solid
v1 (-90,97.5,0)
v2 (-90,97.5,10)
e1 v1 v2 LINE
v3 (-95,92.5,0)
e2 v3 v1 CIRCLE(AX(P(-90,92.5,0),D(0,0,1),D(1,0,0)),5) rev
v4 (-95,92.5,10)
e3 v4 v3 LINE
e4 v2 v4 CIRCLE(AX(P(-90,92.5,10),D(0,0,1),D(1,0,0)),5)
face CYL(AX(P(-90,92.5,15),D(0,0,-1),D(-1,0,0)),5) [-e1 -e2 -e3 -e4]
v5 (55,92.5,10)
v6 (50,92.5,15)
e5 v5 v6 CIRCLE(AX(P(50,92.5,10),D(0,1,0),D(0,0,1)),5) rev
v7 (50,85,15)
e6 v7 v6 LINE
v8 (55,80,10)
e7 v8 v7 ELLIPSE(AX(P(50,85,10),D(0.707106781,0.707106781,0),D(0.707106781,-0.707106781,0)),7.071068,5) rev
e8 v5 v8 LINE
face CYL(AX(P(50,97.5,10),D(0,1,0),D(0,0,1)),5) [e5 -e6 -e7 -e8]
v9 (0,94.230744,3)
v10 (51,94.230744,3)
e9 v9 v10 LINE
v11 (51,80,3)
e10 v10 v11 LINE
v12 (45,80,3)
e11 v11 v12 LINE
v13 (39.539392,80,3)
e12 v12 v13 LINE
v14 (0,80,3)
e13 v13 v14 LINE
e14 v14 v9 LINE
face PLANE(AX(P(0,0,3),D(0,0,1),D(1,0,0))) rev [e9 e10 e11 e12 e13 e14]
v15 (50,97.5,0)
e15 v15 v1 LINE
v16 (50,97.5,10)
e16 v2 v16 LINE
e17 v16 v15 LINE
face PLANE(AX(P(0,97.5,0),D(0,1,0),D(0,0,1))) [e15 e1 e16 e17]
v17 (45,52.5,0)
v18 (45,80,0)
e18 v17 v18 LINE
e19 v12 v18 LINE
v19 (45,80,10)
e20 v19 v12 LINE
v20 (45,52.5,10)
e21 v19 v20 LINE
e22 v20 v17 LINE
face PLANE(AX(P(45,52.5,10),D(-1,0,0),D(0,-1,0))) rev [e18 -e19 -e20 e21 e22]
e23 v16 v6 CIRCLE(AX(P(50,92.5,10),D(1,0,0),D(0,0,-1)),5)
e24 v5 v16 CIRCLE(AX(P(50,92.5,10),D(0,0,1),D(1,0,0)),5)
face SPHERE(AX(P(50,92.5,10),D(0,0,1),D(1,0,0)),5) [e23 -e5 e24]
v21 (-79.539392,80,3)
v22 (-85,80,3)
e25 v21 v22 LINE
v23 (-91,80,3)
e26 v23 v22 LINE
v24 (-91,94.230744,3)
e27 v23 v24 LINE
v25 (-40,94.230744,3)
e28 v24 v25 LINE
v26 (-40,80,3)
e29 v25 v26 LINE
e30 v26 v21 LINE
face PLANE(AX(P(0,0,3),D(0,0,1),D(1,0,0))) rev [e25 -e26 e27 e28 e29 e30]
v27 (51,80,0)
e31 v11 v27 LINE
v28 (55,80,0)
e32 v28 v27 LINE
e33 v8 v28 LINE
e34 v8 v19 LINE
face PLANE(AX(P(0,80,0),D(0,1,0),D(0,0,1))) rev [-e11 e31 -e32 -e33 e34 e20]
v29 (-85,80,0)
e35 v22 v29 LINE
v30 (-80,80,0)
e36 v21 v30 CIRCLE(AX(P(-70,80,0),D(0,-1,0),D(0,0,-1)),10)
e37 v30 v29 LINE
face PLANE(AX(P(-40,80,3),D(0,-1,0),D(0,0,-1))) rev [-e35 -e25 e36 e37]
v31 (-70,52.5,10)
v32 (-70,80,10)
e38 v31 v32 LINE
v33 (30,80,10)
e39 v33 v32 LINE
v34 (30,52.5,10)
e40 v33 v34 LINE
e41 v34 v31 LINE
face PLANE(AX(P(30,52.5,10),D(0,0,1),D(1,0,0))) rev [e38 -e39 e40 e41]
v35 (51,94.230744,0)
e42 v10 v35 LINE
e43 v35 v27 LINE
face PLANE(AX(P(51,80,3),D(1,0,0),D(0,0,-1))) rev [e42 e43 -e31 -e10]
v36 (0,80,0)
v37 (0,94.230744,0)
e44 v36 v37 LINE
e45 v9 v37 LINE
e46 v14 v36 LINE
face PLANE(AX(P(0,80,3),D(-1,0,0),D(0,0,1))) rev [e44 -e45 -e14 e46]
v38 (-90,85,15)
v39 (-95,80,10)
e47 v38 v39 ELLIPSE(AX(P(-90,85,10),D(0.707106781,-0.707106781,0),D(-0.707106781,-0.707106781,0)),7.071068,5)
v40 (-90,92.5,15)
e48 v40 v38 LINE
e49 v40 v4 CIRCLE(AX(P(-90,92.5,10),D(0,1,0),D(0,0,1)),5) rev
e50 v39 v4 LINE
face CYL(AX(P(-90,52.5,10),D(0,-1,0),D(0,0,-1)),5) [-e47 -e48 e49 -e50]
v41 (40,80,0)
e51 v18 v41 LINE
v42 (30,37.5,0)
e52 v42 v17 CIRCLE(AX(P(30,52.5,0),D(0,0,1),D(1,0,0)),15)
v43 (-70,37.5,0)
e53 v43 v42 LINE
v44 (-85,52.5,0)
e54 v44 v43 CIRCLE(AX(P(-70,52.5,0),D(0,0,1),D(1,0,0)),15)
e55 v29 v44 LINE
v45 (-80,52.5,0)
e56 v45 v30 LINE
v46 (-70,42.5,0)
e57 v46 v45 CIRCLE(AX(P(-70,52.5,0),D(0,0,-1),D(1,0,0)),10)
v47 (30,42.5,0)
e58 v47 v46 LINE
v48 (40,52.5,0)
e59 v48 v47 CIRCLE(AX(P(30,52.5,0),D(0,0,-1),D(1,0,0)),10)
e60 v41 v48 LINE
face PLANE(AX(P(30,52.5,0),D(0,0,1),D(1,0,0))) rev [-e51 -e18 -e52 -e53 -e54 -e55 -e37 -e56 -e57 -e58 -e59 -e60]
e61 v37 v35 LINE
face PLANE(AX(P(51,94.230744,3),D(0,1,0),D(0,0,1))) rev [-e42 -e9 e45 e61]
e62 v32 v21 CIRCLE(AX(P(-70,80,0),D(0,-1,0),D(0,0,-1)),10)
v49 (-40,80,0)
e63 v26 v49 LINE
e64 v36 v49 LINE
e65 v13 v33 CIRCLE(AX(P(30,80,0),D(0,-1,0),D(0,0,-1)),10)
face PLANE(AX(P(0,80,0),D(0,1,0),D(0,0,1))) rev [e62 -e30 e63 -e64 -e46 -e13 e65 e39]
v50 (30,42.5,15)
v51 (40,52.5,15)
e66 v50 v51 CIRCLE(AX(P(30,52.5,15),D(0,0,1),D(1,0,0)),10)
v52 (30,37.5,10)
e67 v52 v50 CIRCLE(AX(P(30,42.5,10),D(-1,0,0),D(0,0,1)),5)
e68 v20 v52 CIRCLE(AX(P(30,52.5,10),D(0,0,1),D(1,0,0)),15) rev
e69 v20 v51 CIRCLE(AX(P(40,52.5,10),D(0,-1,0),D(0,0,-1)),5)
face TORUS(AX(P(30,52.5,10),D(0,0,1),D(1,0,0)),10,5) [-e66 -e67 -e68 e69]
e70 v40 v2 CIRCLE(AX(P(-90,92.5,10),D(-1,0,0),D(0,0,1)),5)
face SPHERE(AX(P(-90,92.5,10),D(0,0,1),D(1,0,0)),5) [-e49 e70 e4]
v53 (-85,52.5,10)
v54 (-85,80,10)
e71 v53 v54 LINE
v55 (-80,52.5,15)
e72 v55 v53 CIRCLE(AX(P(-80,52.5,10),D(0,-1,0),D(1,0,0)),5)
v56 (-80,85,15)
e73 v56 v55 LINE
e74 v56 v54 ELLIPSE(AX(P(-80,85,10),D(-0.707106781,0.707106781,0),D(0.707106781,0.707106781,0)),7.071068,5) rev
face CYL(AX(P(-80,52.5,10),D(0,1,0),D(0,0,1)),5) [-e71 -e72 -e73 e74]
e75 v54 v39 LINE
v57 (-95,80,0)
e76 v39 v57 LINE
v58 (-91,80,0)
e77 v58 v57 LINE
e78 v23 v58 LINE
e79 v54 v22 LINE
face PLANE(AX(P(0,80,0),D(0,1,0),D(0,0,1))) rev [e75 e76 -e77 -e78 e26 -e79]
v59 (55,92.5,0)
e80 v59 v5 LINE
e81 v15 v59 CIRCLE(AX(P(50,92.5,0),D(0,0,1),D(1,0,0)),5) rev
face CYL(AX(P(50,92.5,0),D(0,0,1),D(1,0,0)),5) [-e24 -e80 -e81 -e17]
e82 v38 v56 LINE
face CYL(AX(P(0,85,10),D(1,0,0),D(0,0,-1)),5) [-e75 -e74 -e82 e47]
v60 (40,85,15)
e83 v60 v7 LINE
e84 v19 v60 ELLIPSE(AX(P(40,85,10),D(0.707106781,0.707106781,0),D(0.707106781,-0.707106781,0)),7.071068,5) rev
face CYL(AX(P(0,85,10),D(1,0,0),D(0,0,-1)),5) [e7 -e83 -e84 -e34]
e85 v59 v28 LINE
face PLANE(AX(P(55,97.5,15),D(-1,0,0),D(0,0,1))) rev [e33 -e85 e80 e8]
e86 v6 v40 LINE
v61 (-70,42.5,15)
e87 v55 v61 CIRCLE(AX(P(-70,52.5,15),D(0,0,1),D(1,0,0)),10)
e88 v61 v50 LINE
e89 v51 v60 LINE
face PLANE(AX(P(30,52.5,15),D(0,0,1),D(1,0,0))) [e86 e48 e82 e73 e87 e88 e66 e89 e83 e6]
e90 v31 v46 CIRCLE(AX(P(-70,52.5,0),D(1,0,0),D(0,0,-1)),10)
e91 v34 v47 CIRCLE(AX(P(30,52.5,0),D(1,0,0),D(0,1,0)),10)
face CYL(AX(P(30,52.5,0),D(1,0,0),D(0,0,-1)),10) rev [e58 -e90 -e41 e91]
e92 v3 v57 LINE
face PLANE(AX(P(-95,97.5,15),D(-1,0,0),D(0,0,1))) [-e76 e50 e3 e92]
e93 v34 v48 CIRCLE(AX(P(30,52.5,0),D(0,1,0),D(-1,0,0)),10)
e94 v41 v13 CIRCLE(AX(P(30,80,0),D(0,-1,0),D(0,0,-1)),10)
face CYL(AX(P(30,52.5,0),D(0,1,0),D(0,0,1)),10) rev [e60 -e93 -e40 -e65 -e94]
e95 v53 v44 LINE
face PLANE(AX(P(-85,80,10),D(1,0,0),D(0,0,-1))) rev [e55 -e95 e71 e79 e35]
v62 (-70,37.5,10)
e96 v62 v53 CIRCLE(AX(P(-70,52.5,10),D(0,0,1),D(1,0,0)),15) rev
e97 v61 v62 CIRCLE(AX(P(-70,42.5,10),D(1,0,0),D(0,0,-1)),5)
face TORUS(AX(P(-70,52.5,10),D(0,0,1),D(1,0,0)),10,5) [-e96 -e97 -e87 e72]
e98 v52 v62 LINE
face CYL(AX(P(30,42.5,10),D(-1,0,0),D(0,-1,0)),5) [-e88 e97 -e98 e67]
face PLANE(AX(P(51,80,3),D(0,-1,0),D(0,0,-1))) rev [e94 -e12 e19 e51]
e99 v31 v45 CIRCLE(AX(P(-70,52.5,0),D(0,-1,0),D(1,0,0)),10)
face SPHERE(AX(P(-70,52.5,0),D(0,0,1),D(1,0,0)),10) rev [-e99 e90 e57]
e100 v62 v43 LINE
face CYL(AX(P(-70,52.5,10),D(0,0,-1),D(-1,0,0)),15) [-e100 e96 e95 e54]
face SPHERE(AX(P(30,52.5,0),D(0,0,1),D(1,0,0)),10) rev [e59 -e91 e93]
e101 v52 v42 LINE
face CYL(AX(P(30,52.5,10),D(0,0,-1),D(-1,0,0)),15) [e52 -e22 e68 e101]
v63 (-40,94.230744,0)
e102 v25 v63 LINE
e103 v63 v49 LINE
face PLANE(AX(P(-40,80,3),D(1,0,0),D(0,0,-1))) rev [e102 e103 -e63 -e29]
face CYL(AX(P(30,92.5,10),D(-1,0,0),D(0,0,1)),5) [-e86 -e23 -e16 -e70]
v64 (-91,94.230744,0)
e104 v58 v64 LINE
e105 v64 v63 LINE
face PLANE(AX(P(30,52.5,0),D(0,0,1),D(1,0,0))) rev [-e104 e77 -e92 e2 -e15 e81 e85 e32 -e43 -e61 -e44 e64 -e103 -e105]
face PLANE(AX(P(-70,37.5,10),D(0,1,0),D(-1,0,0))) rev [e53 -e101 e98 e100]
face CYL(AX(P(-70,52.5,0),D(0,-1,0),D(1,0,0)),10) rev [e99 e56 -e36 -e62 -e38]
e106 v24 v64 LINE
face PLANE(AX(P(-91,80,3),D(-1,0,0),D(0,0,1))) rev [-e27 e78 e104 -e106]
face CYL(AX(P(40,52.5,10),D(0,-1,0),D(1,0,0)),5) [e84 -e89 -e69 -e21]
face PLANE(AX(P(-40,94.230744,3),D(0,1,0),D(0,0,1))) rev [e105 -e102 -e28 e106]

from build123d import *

# Parameters (mm, degrees)
BOSS_EXTRUDE2_DEPTH = 10
BOSS_EXTRUDE3_DEPTH = 5
FILLET1_R           = 10
SKETCH3_W           = 150
SKETCH3_H           = 15
BOSS_EXTRUDE4_DEPTH = 17.5
SKETCH5_W           = 51
SKETCH5_H           = 14.230744396
CUT_EXTRUDE1_DEPTH  = 3
FILLET2_R           = 5


with BuildPart() as part:
    # Sketch1 → Boss-Extrude2 (new body)
    with BuildSketch(Plane.XY):
        with BuildLine():
            Line((40, 52.5), (40, 80))
            Line((40, 80), (45, 80))
            Line((45, 80), (45, 52.5))
            ThreePointArc((45, 52.5), (40.606601718, 41.893398282), (30, 37.5))
            Line((30, 37.5), (-70, 37.5))
            ThreePointArc((-70, 37.5), (-80.606601718, 41.893398282), (-85, 52.5))
            Line((-85, 52.5), (-85, 80))
            Line((-85, 80), (-80, 80))
            Line((-80, 80), (-80, 52.5))
            ThreePointArc((-80, 52.5), (-77.071067812, 45.428932188), (-70, 42.5))
            Line((-70, 42.5), (30, 42.5))
            ThreePointArc((30, 42.5), (37.071067812, 45.428932188), (40, 52.5))
        make_face()
    extrude(amount=BOSS_EXTRUDE2_DEPTH)

    # Sketch2 → Boss-Extrude3 (add)
    with BuildSketch(Plane.XY.offset(10)):
        with BuildLine():
            Line((45, 52.5), (45, 80))
            Line((45, 80), (-85, 80))
            Line((-85, 80), (-85, 52.5))
            ThreePointArc((-85, 52.5), (-80.606601718, 41.893398282), (-70, 37.5))
            Line((-70, 37.5), (30, 37.5))
            ThreePointArc((30, 37.5), (40.606601718, 41.893398282), (45, 52.5))
        make_face()
    extrude(amount=BOSS_EXTRUDE3_DEPTH)

    # Fillet1
    fillet1_edges = [part.edges().sort_by_distance(p)[0] for p in [
        (-80, 66.25, 10),
        (-77.071067812, 45.428932188, 10),
        (-20, 42.5, 10),
        (37.071067812, 45.428932188, 10),
        (40, 66.25, 10),
    ]]
    fillet(fillet1_edges, radius=FILLET1_R - 0.0001)  # a hair under: the kernel refuses the full size

    # Sketch3 → Boss-Extrude4 (add)
    with BuildSketch(Plane(origin=(0, 80, 0), x_dir=(1, 0, 0), z_dir=(0, 1, 0))):
        with Locations((-20, -7.5)):
            Rectangle(SKETCH3_W, SKETCH3_H)
    extrude(amount=BOSS_EXTRUDE4_DEPTH)

    # Sketch5 → Cut-Extrude1 (cut)
    with BuildSketch(Plane(origin=(0, 0, 0), x_dir=(-1, 0, 0), z_dir=(0, 0, -1))):
        with Locations((-25.5, 87.115372198)):
            Rectangle(SKETCH5_W, SKETCH5_H)
        with Locations((65.5, 87.115372198)):
            Rectangle(SKETCH5_W, SKETCH5_H)
    extrude(amount=-CUT_EXTRUDE1_DEPTH, mode=Mode.SUBTRACT)

    # Fillet2
    fillet2_edges = [part.edges().sort_by_distance(p)[0] for p in [
        (-20, 37.5, 15),
        (-80.606601718, 41.893398282, 15),
        (-85, 66.25, 15),
        (-90, 80, 15),
        (-95, 88.75, 15),
        (-20, 97.5, 15),
        (55, 88.75, 15),
        (50, 80, 15),
        (45, 66.25, 15),
        (40.606601718, 41.893398282, 15),
        (-95, 97.5, 7.5),
        (55, 97.5, 7.5),
    ]]
    fillet(fillet2_edges, radius=FILLET2_R)


solid = part.part
